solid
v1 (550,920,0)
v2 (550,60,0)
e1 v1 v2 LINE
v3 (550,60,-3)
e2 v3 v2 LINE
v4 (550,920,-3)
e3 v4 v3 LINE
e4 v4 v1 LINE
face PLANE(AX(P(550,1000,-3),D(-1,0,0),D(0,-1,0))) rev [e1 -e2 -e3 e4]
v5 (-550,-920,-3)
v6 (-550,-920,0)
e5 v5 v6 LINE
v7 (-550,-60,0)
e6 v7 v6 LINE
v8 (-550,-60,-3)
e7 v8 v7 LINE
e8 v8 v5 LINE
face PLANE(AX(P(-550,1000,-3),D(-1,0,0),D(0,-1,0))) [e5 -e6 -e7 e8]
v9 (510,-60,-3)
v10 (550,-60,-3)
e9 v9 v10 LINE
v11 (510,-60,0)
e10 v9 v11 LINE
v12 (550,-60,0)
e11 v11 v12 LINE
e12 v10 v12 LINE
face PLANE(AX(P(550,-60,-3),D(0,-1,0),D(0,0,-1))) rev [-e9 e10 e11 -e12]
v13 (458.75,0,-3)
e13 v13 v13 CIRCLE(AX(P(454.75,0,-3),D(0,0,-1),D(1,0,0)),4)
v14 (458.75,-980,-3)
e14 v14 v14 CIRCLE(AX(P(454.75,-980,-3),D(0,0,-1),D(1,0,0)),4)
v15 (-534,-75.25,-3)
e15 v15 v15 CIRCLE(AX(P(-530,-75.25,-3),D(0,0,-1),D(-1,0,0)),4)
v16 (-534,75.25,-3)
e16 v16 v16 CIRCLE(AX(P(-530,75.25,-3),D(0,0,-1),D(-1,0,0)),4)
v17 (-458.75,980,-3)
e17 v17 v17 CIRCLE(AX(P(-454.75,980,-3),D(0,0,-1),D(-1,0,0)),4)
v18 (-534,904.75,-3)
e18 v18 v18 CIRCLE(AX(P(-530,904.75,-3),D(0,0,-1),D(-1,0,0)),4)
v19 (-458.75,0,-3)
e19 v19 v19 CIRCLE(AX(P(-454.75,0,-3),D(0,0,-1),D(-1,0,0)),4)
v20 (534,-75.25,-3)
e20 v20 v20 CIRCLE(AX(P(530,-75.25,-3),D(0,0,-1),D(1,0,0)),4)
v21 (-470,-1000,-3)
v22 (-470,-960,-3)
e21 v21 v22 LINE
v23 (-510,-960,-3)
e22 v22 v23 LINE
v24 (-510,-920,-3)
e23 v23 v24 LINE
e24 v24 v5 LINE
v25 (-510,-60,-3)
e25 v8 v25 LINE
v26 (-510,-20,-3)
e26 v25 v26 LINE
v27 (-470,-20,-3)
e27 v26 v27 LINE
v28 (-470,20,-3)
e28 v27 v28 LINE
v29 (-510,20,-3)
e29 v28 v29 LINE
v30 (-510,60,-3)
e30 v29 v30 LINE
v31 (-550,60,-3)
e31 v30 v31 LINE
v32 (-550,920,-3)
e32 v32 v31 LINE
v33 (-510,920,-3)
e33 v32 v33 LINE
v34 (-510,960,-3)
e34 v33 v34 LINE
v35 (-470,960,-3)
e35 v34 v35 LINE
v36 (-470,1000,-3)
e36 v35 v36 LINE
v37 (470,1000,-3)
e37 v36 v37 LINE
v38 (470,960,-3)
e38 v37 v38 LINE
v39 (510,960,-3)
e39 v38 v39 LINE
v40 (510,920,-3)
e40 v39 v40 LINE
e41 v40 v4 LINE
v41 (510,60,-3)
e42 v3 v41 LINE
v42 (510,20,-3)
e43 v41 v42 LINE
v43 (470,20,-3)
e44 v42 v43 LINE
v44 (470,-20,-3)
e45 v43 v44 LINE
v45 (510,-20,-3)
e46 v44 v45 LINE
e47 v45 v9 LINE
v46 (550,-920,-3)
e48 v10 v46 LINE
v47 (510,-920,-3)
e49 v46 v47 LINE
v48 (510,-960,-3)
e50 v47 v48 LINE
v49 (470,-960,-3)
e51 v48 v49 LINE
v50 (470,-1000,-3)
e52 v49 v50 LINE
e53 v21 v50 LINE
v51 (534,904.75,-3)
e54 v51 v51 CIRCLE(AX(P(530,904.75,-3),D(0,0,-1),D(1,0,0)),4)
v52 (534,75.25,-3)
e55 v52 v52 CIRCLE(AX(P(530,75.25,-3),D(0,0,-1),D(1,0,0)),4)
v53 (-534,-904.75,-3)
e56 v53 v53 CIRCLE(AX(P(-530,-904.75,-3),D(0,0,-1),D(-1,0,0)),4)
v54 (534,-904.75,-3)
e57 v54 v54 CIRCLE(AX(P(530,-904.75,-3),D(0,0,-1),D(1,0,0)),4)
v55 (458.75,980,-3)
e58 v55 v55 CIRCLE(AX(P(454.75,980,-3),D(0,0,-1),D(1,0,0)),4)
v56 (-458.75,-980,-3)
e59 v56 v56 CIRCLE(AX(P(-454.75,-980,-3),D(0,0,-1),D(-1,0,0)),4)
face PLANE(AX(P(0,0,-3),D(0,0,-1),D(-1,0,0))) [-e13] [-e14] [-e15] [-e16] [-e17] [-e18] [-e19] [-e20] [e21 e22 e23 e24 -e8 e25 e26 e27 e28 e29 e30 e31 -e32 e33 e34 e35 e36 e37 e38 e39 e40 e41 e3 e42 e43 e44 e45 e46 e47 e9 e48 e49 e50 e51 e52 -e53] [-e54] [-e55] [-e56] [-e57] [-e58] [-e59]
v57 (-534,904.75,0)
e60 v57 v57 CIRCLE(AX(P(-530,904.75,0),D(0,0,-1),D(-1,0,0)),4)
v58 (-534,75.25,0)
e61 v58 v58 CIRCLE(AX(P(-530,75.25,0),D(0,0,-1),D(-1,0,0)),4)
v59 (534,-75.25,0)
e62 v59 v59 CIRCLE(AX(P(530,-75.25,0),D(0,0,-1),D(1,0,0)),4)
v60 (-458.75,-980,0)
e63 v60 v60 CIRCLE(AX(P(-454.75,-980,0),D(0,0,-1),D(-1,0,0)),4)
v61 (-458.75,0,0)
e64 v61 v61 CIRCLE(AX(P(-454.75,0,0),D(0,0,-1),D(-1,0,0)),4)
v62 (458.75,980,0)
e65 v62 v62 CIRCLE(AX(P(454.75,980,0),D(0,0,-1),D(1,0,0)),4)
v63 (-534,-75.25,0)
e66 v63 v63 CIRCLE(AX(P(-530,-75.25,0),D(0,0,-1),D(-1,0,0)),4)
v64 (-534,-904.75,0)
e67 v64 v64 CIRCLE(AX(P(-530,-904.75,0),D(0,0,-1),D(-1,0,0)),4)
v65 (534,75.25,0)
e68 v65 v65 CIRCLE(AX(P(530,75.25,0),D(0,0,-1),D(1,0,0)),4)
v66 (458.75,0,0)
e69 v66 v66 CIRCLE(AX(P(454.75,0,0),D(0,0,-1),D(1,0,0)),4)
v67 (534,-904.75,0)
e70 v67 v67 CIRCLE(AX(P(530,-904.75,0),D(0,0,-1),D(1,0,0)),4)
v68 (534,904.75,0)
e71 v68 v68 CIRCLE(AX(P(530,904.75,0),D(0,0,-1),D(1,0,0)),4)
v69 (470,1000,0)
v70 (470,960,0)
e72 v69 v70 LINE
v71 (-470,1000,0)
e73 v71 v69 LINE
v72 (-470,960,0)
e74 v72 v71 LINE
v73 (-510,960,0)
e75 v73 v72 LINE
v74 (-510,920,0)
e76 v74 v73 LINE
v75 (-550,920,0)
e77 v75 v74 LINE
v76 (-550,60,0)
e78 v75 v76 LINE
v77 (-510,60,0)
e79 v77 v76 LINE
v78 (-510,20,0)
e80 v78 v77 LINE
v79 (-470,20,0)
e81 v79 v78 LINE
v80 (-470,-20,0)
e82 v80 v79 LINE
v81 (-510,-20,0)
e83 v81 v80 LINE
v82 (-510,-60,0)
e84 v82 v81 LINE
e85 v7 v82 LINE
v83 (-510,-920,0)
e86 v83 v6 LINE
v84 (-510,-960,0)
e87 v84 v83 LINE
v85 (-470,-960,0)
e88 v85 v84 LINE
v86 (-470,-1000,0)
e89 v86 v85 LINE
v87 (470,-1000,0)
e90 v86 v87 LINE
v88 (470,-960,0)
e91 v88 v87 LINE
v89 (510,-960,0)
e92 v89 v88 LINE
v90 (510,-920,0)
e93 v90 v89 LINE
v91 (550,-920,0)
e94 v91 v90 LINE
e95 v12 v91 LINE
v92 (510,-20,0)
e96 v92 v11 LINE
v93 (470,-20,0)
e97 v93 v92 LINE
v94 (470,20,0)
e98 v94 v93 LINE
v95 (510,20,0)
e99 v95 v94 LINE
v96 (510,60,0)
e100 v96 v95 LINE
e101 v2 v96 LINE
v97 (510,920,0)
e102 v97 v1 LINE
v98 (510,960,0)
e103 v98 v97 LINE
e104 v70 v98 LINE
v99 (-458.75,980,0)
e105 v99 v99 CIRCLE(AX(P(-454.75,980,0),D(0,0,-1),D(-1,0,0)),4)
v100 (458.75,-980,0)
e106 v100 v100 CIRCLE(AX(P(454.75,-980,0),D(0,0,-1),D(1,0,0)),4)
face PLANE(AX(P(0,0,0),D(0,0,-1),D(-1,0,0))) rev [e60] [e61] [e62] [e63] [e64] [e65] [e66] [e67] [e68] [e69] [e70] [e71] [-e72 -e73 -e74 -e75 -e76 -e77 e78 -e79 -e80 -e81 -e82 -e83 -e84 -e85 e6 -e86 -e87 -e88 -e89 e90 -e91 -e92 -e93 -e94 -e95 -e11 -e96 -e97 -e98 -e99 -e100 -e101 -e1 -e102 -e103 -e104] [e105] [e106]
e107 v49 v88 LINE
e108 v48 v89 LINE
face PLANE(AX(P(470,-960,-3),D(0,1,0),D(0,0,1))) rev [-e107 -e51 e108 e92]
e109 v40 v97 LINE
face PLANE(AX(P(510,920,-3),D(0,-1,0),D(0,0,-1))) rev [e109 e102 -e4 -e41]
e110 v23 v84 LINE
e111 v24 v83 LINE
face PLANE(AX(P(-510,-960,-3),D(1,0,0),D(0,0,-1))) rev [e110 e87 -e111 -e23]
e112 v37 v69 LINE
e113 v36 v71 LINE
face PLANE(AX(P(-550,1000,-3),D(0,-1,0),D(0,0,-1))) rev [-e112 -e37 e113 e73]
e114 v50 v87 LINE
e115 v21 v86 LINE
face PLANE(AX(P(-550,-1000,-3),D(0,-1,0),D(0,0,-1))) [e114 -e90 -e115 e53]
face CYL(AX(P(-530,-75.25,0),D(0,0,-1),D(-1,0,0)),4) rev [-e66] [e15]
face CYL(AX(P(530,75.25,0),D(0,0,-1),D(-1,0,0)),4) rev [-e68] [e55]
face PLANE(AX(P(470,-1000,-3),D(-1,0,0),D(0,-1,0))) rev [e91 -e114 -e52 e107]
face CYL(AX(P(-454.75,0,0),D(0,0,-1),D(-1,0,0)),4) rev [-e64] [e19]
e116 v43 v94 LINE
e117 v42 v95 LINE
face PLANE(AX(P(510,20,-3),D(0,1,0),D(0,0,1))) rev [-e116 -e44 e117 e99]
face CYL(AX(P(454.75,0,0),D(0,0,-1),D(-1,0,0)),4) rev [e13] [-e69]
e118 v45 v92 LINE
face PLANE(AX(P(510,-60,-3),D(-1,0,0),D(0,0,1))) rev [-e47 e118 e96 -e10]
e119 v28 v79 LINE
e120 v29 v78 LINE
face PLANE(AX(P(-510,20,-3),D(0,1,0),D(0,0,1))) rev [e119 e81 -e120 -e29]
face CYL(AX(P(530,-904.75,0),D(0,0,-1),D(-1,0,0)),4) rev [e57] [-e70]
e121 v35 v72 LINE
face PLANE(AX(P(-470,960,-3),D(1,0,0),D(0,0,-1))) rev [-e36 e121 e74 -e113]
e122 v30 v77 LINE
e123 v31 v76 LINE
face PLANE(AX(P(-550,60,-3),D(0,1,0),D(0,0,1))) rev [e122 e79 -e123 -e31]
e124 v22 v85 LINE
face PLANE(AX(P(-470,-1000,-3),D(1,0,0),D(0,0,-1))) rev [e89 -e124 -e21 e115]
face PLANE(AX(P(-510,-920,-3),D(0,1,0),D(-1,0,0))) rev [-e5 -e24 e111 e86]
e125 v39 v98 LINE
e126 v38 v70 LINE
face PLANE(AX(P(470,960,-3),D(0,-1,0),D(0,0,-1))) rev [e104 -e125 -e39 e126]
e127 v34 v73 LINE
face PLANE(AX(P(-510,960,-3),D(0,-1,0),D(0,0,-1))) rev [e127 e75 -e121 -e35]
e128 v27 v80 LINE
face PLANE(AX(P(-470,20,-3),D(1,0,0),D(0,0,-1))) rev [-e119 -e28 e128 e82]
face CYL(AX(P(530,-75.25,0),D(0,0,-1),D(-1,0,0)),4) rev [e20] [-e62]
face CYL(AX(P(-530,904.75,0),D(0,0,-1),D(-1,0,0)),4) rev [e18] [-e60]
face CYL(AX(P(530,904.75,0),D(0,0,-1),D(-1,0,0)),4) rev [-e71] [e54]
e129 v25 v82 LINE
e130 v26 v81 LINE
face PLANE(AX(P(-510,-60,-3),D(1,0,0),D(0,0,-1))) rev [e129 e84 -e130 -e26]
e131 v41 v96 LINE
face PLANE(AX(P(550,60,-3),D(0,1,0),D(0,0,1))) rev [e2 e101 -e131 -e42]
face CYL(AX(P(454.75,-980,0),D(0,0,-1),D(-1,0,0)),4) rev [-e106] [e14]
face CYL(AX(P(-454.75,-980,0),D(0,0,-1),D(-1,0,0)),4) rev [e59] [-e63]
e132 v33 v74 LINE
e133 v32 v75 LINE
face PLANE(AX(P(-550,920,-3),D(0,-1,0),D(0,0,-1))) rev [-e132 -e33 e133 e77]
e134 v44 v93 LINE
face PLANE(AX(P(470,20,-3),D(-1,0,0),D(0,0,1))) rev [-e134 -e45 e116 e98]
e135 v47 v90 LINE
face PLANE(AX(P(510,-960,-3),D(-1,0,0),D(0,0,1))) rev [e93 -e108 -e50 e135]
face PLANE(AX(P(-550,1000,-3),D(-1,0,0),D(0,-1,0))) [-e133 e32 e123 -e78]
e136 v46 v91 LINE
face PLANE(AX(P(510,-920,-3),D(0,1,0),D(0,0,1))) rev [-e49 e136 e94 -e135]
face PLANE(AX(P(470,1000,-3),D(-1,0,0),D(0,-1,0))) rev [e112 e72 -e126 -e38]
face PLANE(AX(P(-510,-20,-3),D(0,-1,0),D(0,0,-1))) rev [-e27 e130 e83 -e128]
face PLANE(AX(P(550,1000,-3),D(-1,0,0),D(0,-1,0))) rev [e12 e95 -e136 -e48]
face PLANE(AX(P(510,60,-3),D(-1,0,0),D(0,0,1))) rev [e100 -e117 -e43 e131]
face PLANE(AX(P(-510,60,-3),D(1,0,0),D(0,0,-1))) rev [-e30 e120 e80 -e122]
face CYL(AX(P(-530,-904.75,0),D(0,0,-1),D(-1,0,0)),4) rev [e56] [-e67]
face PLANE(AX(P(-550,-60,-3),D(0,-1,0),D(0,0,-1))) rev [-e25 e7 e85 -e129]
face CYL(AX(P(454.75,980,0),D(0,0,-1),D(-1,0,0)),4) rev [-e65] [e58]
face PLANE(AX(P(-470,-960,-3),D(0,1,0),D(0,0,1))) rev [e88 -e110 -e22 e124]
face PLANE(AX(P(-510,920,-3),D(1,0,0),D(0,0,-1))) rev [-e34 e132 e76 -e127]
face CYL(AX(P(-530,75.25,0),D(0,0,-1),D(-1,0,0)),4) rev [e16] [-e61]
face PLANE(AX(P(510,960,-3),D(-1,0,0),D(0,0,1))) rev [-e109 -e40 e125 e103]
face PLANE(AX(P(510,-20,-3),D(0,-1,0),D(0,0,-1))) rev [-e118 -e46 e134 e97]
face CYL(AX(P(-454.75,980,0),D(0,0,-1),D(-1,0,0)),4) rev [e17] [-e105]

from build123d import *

# Parameters (mm, degrees)
SCHIZZO1_W               = 1100
SCHIZZO1_H               = 2000
BASE_FLANGIA1_DEPTH      = 3
TAGLIO_ESTRUSIONE1_DEPTH = 1142.275164016
TAGLIO_ESTRUSIONE3_DEPTH = 1142.275164016
SCHIZZO6_R               = 4
TAGLIO_ESTRUSIONE4_DEPTH = 1142.275164016


# Sheet-metal steps are written as plain solids
with BuildPart() as part:
    # Schizzo1 → Base-Flangia1 (new body)
    with BuildSketch(Plane.XY):
        Rectangle(SCHIZZO1_W, SCHIZZO1_H)
    extrude(amount=-BASE_FLANGIA1_DEPTH)

    # Schizzo2 → Taglio-Estrusione1 (cut, through all)
    with BuildSketch(Plane.XY):
        Polygon((-550, -1000), (-470, -1000), (-470, -960), (-510, -960), (-510, -920), (-550, -920), align=None)
        Polygon((550, -1000), (470, -1000), (470, -960), (510, -960), (510, -920), (550, -920), align=None)
        Polygon((550, 1000), (470, 1000), (470, 960), (510, 960), (510, 920), (550, 920), align=None)
        Polygon((-550, 1000), (-550, 920), (-510, 920), (-510, 960), (-470, 960), (-470, 1000), align=None)
    extrude(amount=-TAGLIO_ESTRUSIONE1_DEPTH, mode=Mode.SUBTRACT)

    # Schizzo4 → Taglio-Estrusione3 (cut, through all)
    with BuildSketch(Plane.XY):
        Polygon((-550, -60), (-550, 60), (-510, 60), (-510, 20), (-470, 20), (-470, -20), (-510, -20), (-510, -60), align=None)
        Polygon((510, 20), (470, 20), (470, -20), (510, -20), (510, -60), (550, -60), (550, 60), (510, 60), align=None)
    extrude(amount=-TAGLIO_ESTRUSIONE3_DEPTH, mode=Mode.SUBTRACT)

    # Schizzo6 → Taglio-Estrusione4 (cut, through all)
    with BuildSketch(Plane(origin=(0, 0, -3), x_dir=(-1, 0, 0), z_dir=(0, 0, -1))):
        with Locations(Location((-454.75, -980, 0), (0, 0, 180))):
            Circle(SCHIZZO6_R)
        with Locations(Location((-530, -904.75, 0), (0, 0, 180))):
            Circle(SCHIZZO6_R)
        with Locations(Location((-530, -75.25, 0), (0, 0, 180))):
            Circle(SCHIZZO6_R)
        with Locations(Location((-454.75, 0, 0), (0, 0, 180))):
            Circle(SCHIZZO6_R)
        with Locations(Location((-530, 75.25, 0), (0, 0, 180))):
            Circle(SCHIZZO6_R)
        with Locations(Location((-530, 904.75, 0), (0, 0, 180))):
            Circle(SCHIZZO6_R)
        with Locations(Location((-454.75, 980, 0), (0, 0, 180))):
            Circle(SCHIZZO6_R)
        with Locations((454.75, 980)):
            Circle(SCHIZZO6_R)
        with Locations((530, 904.75)):
            Circle(SCHIZZO6_R)
        with Locations((530, 75.25)):
            Circle(SCHIZZO6_R)
        with Locations((454.75, 0)):
            Circle(SCHIZZO6_R)
        with Locations((530, -75.25)):
            Circle(SCHIZZO6_R)
        with Locations((530, -904.75)):
            Circle(SCHIZZO6_R)
        with Locations((454.75, -980)):
            Circle(SCHIZZO6_R)
    extrude(amount=-TAGLIO_ESTRUSIONE4_DEPTH, mode=Mode.SUBTRACT)


solid = part.part
